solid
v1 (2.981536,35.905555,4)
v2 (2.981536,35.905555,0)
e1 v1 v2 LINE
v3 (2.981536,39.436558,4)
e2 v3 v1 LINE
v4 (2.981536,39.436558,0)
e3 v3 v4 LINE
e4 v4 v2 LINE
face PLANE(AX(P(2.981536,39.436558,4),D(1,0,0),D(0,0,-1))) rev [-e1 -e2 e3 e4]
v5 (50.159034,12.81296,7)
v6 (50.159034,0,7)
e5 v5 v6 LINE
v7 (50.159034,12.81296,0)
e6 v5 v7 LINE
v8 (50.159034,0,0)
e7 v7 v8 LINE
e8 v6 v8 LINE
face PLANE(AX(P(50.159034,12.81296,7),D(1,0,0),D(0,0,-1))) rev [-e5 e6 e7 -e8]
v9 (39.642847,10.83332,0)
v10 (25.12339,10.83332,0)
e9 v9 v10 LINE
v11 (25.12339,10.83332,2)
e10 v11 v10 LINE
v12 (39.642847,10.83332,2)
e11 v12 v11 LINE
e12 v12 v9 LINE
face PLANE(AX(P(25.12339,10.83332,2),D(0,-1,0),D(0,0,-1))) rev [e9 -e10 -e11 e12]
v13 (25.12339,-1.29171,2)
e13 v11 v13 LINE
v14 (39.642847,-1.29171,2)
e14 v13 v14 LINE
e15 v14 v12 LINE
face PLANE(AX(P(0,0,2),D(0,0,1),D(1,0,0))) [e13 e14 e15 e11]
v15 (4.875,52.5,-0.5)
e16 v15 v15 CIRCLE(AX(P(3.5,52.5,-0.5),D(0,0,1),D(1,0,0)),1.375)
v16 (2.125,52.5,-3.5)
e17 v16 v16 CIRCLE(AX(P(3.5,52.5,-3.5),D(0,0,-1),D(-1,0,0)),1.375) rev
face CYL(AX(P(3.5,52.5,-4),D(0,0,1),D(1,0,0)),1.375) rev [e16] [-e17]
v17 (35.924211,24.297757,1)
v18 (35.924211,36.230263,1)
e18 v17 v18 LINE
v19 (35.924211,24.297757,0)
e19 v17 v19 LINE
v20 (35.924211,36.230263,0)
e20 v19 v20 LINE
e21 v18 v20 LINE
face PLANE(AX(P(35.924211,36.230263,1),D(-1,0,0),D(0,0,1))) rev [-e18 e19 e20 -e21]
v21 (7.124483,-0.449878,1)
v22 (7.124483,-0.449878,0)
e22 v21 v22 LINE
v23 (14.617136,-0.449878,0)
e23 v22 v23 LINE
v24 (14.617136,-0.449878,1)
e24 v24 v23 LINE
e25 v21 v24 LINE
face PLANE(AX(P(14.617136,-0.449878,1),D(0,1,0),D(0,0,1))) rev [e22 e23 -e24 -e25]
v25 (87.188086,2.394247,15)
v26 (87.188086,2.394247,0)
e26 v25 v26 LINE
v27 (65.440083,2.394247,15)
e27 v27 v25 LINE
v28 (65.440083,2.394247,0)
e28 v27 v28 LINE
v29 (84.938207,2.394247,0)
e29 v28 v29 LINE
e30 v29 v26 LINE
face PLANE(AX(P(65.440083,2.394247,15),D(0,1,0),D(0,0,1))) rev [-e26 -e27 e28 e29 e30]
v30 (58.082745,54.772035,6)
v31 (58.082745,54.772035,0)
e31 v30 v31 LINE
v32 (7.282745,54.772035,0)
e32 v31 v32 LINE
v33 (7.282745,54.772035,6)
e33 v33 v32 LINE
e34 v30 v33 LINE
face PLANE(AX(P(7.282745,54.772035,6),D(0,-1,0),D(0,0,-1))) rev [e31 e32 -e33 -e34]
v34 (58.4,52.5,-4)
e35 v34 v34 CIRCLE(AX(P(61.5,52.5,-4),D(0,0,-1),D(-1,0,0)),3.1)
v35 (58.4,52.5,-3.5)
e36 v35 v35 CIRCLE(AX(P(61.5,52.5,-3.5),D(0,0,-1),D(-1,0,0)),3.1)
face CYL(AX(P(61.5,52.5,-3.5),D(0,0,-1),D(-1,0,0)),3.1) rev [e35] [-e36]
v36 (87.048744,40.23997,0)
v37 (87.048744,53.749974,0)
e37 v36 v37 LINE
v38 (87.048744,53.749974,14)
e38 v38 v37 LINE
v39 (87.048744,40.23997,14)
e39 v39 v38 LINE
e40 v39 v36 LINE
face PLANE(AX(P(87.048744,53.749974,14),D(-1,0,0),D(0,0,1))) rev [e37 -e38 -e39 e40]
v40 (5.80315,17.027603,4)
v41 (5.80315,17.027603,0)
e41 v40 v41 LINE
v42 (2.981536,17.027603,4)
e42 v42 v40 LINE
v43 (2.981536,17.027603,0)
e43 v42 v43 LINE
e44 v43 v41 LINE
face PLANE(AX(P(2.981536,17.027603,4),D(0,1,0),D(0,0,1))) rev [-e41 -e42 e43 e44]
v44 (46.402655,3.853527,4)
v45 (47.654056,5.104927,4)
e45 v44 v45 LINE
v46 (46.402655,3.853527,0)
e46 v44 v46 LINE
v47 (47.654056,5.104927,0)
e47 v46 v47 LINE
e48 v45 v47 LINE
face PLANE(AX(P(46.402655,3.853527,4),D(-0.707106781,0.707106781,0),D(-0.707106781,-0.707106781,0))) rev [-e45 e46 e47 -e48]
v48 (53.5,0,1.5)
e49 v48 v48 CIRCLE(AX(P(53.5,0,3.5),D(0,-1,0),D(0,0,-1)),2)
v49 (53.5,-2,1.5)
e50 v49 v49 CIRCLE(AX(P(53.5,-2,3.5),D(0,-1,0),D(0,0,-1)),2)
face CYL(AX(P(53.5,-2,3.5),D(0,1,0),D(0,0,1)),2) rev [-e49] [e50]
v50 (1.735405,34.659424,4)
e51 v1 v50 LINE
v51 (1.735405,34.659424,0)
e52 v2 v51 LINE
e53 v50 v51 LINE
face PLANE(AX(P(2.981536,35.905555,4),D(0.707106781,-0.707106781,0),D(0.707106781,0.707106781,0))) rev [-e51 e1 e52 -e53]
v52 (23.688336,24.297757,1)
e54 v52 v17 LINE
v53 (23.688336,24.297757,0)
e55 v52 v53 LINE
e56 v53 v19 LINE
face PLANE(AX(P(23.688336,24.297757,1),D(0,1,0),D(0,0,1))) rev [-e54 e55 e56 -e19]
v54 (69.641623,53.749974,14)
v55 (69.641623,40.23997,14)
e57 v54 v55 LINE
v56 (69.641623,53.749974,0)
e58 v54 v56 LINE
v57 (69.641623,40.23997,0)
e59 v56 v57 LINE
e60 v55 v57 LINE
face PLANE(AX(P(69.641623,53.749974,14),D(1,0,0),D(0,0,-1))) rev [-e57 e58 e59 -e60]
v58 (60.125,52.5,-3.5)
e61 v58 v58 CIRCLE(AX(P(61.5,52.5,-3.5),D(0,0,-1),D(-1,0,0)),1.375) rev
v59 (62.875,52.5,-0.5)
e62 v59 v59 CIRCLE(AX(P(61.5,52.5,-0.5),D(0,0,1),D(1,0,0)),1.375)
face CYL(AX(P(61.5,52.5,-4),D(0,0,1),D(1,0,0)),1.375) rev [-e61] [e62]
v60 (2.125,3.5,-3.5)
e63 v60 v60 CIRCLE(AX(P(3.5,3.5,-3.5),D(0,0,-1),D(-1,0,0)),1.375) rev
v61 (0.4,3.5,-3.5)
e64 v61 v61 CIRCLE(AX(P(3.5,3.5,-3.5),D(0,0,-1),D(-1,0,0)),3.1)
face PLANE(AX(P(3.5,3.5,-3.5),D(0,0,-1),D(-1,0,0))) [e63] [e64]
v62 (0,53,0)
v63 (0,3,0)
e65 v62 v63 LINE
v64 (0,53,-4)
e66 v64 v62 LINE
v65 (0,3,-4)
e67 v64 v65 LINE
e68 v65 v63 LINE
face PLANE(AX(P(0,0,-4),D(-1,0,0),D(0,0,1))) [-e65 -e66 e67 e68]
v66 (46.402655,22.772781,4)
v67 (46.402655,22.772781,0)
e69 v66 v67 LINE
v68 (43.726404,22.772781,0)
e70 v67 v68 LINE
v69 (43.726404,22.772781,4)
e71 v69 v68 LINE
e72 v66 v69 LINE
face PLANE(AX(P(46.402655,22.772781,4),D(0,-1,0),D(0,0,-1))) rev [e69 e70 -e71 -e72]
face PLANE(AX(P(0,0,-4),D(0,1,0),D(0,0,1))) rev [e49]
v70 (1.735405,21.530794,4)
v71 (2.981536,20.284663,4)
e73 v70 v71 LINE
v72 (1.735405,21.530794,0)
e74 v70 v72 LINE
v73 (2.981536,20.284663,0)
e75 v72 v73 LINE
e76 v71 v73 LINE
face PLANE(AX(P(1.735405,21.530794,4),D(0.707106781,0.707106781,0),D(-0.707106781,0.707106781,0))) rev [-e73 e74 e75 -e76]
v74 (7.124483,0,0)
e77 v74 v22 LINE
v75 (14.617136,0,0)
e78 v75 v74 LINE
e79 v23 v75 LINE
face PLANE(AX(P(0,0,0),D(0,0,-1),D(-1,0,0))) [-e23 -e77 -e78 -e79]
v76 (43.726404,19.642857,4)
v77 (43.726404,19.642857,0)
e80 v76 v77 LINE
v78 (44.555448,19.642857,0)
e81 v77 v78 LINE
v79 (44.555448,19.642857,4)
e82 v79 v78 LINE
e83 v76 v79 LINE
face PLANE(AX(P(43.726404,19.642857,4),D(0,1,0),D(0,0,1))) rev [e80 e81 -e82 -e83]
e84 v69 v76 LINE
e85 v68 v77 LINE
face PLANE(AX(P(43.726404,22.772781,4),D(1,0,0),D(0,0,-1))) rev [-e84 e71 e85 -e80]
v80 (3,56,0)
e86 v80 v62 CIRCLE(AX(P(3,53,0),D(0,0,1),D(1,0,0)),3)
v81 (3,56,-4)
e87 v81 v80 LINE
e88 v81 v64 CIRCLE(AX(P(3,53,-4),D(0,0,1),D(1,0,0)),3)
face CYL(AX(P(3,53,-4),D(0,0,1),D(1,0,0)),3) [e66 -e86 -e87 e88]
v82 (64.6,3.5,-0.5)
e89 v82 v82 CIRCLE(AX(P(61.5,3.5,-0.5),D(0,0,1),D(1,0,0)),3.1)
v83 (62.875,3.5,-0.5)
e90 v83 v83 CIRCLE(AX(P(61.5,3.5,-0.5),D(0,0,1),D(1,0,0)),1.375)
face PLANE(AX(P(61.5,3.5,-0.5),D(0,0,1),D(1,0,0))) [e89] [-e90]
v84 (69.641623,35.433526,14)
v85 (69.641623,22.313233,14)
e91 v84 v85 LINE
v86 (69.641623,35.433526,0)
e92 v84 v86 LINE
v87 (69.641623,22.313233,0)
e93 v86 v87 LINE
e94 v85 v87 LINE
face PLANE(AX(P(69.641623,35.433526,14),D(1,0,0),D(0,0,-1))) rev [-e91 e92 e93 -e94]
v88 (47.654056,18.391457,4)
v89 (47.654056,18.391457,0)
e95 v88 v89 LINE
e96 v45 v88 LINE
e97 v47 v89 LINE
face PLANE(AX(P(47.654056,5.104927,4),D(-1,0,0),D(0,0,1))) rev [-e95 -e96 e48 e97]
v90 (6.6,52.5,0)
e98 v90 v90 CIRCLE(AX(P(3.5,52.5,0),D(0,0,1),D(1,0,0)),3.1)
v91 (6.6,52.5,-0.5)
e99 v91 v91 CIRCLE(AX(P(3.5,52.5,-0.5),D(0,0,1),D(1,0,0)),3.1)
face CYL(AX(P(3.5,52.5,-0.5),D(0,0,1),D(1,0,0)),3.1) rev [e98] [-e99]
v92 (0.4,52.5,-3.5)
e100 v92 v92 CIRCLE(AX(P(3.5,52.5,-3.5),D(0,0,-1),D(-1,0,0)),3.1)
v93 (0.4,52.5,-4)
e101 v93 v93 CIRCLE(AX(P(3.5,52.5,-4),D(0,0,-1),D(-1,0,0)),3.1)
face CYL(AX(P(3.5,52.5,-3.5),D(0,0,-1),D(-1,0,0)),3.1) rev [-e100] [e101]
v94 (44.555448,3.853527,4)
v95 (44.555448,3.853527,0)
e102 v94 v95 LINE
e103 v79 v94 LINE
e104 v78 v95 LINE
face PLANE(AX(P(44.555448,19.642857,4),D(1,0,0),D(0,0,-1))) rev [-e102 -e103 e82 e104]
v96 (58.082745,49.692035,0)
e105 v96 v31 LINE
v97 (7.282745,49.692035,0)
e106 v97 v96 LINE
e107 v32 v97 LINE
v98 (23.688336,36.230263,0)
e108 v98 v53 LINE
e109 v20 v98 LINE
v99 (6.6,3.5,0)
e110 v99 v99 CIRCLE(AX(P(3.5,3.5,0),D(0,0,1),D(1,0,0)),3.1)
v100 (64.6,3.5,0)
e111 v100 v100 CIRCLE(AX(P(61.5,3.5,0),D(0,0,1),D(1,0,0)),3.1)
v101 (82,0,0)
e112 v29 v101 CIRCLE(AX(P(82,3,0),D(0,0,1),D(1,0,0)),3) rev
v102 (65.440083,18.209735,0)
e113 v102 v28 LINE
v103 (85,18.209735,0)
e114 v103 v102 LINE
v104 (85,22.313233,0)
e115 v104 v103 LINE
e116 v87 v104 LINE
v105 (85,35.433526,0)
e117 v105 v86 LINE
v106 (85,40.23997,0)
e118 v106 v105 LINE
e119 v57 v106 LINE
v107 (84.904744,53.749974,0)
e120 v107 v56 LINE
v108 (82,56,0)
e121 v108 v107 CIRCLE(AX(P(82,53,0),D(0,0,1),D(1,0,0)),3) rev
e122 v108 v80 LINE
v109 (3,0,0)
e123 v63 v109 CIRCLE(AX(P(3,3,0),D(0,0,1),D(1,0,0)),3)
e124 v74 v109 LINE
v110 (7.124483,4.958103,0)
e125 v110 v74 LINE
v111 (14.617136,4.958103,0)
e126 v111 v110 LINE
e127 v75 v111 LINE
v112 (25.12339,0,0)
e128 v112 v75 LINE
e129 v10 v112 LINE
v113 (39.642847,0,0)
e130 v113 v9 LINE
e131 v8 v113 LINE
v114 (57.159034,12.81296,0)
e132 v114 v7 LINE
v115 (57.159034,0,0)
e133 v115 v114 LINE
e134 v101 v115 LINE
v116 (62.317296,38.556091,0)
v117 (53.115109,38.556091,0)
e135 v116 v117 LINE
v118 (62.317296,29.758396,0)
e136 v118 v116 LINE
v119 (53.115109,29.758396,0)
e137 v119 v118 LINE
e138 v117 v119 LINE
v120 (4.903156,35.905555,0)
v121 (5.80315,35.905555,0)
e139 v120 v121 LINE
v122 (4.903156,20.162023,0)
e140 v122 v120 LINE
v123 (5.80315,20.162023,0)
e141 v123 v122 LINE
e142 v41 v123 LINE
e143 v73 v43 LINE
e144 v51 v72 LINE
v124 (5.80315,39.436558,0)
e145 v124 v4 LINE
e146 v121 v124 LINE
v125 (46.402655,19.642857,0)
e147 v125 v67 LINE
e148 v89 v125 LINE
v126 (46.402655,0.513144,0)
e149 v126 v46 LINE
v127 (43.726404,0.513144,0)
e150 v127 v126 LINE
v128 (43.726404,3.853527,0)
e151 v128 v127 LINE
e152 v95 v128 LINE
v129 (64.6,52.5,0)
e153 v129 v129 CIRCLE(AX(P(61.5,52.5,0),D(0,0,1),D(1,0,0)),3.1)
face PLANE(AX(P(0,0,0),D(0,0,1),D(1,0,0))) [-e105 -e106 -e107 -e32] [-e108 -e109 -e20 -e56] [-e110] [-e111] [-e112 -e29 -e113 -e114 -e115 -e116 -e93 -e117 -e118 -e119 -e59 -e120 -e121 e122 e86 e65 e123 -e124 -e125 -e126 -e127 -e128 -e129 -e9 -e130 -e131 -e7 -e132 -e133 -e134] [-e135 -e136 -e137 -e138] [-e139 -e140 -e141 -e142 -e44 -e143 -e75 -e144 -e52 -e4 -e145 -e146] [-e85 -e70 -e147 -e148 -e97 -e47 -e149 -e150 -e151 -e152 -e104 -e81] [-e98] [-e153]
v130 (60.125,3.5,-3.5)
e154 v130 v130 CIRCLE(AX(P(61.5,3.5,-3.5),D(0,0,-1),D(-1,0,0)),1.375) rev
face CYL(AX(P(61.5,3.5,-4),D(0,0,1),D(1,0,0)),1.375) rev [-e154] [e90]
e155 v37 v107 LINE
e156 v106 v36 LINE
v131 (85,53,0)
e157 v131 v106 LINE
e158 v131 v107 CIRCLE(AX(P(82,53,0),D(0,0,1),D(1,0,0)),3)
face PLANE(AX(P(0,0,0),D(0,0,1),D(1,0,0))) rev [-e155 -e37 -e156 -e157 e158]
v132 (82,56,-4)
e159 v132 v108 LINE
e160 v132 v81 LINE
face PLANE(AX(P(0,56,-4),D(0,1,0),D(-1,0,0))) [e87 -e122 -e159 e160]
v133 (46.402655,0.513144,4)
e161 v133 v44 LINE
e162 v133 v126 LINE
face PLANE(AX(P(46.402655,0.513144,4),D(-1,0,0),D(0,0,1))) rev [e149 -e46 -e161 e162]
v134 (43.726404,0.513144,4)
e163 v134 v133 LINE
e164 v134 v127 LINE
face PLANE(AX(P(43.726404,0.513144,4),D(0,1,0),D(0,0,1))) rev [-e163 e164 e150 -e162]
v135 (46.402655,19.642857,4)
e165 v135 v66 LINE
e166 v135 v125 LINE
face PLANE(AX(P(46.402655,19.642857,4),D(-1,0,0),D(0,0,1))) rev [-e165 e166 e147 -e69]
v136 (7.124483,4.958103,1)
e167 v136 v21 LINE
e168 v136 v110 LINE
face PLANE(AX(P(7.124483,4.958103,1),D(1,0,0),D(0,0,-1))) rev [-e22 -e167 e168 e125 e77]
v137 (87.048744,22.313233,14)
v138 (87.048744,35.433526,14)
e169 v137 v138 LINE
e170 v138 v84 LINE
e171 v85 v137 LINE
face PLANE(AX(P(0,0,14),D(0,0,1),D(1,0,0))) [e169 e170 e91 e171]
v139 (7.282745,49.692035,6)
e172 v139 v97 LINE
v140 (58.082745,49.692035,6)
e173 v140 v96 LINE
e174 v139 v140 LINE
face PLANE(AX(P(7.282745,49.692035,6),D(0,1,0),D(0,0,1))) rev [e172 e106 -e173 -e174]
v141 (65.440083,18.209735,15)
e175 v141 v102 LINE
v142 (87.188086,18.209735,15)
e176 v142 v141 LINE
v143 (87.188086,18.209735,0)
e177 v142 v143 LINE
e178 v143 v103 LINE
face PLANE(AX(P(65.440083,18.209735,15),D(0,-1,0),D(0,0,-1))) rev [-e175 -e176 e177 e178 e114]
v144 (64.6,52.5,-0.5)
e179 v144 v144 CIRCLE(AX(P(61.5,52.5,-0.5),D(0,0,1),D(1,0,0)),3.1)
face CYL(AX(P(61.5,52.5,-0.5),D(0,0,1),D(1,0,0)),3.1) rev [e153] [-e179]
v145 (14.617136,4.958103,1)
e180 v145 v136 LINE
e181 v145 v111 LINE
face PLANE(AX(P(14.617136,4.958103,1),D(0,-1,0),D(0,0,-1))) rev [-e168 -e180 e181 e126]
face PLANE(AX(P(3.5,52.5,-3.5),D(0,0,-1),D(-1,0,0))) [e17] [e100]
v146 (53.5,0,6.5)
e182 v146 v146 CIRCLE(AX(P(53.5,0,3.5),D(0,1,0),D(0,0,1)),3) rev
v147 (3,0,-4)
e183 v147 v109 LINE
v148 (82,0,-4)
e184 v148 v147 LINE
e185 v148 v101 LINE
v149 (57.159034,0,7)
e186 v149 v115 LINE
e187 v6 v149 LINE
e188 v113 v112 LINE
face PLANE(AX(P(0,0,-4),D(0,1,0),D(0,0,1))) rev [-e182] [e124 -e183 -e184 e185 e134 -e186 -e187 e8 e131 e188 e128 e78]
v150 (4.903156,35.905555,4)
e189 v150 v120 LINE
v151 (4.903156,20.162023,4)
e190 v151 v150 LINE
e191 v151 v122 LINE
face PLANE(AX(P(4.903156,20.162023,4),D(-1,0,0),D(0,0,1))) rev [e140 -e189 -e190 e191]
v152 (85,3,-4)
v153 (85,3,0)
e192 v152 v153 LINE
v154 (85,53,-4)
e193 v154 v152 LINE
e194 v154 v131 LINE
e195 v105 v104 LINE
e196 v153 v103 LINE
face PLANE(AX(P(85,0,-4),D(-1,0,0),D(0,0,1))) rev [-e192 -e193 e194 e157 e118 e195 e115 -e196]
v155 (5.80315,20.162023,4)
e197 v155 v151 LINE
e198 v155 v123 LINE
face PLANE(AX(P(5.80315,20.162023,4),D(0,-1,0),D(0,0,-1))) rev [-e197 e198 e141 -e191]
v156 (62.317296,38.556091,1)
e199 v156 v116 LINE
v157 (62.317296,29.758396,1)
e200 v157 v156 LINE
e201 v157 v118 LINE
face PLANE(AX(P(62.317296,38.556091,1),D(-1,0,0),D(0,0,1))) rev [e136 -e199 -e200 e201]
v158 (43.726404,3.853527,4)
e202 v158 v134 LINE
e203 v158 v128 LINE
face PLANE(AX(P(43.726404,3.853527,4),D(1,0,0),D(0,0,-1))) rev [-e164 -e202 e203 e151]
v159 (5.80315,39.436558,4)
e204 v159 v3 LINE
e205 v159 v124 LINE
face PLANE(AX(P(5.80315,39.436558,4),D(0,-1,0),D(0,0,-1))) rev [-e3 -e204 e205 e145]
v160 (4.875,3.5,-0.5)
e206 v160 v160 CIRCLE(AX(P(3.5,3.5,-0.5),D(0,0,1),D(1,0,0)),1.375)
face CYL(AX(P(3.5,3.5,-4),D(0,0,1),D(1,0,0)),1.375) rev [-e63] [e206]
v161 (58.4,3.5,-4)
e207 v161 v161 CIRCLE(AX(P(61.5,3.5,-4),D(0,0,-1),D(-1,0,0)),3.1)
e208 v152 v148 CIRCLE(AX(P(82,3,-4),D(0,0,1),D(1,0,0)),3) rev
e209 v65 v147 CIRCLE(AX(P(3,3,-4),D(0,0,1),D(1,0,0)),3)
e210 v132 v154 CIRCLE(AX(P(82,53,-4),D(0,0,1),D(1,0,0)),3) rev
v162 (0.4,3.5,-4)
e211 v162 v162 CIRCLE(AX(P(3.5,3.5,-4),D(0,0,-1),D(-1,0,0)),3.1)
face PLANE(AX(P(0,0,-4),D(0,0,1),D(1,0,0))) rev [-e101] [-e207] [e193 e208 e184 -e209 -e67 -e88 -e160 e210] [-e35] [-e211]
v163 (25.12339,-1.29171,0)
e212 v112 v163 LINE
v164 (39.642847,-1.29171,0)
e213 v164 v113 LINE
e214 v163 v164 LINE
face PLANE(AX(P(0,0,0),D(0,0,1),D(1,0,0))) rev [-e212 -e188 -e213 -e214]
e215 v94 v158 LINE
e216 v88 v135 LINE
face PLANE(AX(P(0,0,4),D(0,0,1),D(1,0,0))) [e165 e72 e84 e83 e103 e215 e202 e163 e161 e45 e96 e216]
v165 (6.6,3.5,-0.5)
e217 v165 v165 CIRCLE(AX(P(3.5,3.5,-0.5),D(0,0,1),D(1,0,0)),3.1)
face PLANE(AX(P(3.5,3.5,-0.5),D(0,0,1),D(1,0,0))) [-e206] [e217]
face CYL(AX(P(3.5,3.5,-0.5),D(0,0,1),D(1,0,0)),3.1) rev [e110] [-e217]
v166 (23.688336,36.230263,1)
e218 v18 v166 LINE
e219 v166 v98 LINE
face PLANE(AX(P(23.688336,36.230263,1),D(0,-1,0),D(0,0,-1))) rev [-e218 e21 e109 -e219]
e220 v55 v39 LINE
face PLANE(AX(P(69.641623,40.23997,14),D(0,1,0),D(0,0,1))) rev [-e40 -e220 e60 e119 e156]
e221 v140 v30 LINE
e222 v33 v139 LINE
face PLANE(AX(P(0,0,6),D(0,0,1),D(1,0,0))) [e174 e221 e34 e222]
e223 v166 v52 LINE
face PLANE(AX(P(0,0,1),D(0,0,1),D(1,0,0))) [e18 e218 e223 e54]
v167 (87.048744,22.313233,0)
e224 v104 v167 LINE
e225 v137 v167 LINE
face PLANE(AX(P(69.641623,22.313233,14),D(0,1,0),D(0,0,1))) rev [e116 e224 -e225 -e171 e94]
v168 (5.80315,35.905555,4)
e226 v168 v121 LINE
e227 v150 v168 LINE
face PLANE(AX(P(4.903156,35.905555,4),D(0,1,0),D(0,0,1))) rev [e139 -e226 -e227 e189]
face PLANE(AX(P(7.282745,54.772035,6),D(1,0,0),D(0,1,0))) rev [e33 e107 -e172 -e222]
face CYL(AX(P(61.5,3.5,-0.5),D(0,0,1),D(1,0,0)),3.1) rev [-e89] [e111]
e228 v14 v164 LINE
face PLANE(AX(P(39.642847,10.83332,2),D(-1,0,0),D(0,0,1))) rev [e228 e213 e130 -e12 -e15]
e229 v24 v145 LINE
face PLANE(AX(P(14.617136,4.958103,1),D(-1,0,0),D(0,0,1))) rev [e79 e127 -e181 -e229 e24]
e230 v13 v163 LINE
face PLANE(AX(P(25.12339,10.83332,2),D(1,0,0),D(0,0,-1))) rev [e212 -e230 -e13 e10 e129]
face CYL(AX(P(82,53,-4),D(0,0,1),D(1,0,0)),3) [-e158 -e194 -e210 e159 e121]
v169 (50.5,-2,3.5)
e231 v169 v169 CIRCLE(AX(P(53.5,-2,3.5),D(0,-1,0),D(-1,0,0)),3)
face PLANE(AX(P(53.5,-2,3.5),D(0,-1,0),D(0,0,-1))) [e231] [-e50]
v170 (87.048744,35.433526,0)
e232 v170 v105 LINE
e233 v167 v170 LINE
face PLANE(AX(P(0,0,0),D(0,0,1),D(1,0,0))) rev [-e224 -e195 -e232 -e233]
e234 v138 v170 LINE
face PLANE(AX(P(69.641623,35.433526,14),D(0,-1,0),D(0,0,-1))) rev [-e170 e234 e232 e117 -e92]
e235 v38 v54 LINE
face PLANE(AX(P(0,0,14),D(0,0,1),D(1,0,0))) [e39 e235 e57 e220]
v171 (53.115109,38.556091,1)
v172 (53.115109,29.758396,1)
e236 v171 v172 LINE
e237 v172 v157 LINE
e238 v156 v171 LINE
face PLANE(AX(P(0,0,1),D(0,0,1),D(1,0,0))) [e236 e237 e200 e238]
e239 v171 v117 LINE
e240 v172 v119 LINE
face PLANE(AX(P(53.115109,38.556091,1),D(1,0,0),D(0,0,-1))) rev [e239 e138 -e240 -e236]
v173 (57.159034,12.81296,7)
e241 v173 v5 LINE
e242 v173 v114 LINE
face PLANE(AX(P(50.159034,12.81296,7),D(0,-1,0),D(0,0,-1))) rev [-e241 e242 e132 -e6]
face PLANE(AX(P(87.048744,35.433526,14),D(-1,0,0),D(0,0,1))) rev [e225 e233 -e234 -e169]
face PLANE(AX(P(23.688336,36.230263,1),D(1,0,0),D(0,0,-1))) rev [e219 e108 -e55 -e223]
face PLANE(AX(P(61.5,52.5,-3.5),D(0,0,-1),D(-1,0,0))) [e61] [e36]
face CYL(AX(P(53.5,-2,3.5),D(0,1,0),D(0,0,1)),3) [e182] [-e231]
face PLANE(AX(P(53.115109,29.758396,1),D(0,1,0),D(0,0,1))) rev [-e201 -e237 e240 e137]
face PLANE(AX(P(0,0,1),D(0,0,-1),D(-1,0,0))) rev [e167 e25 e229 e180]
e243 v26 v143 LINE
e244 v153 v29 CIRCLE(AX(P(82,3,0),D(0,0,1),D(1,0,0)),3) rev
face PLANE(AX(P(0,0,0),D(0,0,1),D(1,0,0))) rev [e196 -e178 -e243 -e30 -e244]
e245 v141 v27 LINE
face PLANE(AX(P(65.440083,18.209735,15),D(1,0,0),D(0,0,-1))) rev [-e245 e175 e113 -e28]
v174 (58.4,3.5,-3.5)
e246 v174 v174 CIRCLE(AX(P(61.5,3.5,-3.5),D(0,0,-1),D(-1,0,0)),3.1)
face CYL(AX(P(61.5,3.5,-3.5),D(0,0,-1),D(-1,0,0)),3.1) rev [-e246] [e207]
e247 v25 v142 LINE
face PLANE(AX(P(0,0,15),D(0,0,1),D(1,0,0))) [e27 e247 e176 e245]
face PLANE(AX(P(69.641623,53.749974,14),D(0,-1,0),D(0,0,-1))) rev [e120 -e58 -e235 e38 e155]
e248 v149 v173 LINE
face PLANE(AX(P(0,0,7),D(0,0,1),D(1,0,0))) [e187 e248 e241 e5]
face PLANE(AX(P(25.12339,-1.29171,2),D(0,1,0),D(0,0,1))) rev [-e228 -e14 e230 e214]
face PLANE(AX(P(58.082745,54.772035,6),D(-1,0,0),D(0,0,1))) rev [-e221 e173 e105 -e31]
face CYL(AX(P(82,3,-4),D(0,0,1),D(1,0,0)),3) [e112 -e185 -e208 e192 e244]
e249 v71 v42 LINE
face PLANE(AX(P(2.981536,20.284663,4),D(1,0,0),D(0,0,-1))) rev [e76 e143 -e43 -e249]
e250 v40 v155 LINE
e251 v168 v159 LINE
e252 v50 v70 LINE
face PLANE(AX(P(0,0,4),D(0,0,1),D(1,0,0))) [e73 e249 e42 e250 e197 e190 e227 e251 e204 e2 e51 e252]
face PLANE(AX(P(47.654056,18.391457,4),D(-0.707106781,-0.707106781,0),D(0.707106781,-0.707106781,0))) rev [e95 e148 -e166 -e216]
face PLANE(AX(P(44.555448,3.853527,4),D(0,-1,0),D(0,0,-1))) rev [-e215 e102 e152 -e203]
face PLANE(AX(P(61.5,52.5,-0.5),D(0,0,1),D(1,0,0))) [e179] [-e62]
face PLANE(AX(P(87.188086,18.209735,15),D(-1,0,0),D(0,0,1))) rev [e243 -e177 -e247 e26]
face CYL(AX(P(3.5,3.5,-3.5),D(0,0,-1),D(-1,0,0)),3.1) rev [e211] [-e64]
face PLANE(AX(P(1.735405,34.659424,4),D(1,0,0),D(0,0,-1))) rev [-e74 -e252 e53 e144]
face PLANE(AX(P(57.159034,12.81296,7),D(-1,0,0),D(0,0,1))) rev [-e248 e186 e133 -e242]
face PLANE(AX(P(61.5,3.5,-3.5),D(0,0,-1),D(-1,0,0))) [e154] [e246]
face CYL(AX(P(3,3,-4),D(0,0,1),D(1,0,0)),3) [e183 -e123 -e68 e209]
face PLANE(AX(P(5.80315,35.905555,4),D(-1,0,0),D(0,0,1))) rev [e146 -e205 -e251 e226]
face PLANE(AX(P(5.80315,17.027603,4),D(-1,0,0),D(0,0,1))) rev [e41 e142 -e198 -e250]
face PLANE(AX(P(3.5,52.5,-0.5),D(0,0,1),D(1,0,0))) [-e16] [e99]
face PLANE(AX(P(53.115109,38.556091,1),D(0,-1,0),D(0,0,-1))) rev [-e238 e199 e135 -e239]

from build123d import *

# Parameters (mm, degrees)
EXTRUDE_START       = -4
EXTRUDE_2_DEPTH     = 4
SKETCH_2_R          = 3.1
CUT_EXTRUDE_1_DEPTH = 0.5
SKETCH_3_R          = 1.375
CUT_EXTRUDE_2_DEPTH = 4
SKETCH_4_W          = 50.8
SKETCH_4_H          = 5.08
EXTRUDE_3_DEPTH     = 6
SKETCH_5_W          = 12.235874624
SKETCH_5_H          = 11.932505832
EXTRUDE_4_DEPTH     = 1
SKETCH_6_W          = 17.407120639
SKETCH_6_H          = 13.510004078
SKETCH_6_H_2        = 13.120292422
EXTRUDE_5_DEPTH     = 14
SKETCH_7_W          = 21.748003317
SKETCH_7_H          = 15.815488158
EXTRUDE_6_DEPTH     = 15
SKETCH_8_W          = 9.2021867
SKETCH_8_H          = 8.797694978
EXTRUDE_7_DEPTH     = 1
SKETCH_9_W          = 14.519457286
SKETCH_9_H          = 12.125029798
EXTRUDE_8_DEPTH     = 2
SKETCH_10_W         = 7
SKETCH_10_H         = 12.812960392
EXTRUDE_9_DEPTH     = 7
SKETCH_11_R         = 3
SKETCH_11_R_2       = 2
EXTRUDE_1_DEPTH     = 2
EXTRUDE_10_DEPTH    = 4
SKETCH_13_W         = 7.492652901
SKETCH_13_H         = 5.40798094
EXTRUDE_11_DEPTH    = 1
EXTRUDE_12_DEPTH    = 4
CUT_EXTRUDE_START   = -0.5
SKETCH_15_R         = 3.1
CUT_EXTRUDE_3_DEPTH = 0.5


# Read off the part's stored shape, not the designer's step: 凸台-拉伸2
with BuildPart() as part:
    # 凸台-拉伸2 outline → 凸台-拉伸2 (new body)
    with BuildSketch(Plane.XY.offset(EXTRUDE_START)):
        with BuildLine():
            ThreePointArc((3, 56), (0.878679656, 55.121320344), (0, 53))
            Line((0, 53), (0, 3))
            ThreePointArc((0, 3), (0.878679656, 0.878679656), (3, 0))
            Line((3, 0), (82, 0))
            ThreePointArc((82, 0), (84.121320344, 0.878679656), (85, 3))
            Line((85, 3), (85, 53))
            ThreePointArc((85, 53), (84.121320344, 55.121320344), (82, 56))
            Line((82, 56), (3, 56))
        make_face()
    extrude(amount=EXTRUDE_2_DEPTH)

    # 草图2 → 切除-拉伸1 (cut)
    with BuildSketch(Plane.XY):
        with Locations((3.5, 3.5)):
            Circle(SKETCH_2_R)
        with Locations((61.5, 3.5)):
            Circle(SKETCH_2_R)
        with Locations((3.5, 52.5)):
            Circle(SKETCH_2_R)
        with Locations((61.5, 52.5)):
            Circle(SKETCH_2_R)
    extrude(amount=-CUT_EXTRUDE_1_DEPTH, mode=Mode.SUBTRACT)

    # 草图3 → 切除-拉伸2 (cut)
    with BuildSketch(Plane.XY):
        with Locations((3.5, 52.5)):
            Circle(SKETCH_3_R)
        with Locations((61.5, 52.5)):
            Circle(SKETCH_3_R)
        with Locations((3.5, 3.5)):
            Circle(SKETCH_3_R)
        with Locations((61.5, 3.5)):
            Circle(SKETCH_3_R)
    extrude(amount=-CUT_EXTRUDE_2_DEPTH, mode=Mode.SUBTRACT)

    # 草图4 → 凸台-拉伸3 (add)
    with BuildSketch(Plane.XY):
        with Locations((32.682745254, 52.232035351)):
            Rectangle(SKETCH_4_W, SKETCH_4_H)
    extrude(amount=EXTRUDE_3_DEPTH)

    # 草图5 → 凸台-拉伸4 (add)
    with BuildSketch(Plane.XY):
        with Locations((29.806273598, 30.264010216)):
            Rectangle(SKETCH_5_W, SKETCH_5_H)
    extrude(amount=EXTRUDE_4_DEPTH)

    # 草图6 → 凸台-拉伸5 (add)
    with BuildSketch(Plane.XY):
        with Locations((78.345183612, 46.994971673)):
            Rectangle(SKETCH_6_W, SKETCH_6_H)
        with Locations((78.345183612, 28.873379664)):
            Rectangle(SKETCH_6_W, SKETCH_6_H_2)
    extrude(amount=EXTRUDE_5_DEPTH)

    # 草图7 → 凸台-拉伸6 (add)
    with BuildSketch(Plane.XY):
        with Locations((76.314084713, 10.301990913)):
            Rectangle(SKETCH_7_W, SKETCH_7_H)
    extrude(amount=EXTRUDE_6_DEPTH)

    # 草图8 → 凸台-拉伸7 (add)
    with BuildSketch(Plane.XY):
        with Locations((57.716202493, 34.157243051)):
            Rectangle(SKETCH_8_W, SKETCH_8_H)
    extrude(amount=EXTRUDE_7_DEPTH)

    # 草图9 → 凸台-拉伸8 (add)
    with BuildSketch(Plane.XY):
        with Locations((32.383118315, 4.770804671)):
            Rectangle(SKETCH_9_W, SKETCH_9_H)
    extrude(amount=EXTRUDE_8_DEPTH)

    # 草图10 → 凸台-拉伸9 (add)
    with BuildSketch(Plane.XY):
        with Locations((53.659033893, 6.406480196)):
            Rectangle(SKETCH_10_W, SKETCH_10_H)
    extrude(amount=EXTRUDE_9_DEPTH)

    # 草图11 → 拉伸-薄壁1 (add)
    with BuildSketch(Plane(origin=(0, 0, 0), x_dir=(-1, 0, 0), z_dir=(0, -1, 0))):
        with Locations((-53.5, -3.5)):
            Circle(SKETCH_11_R)
        with Locations((-53.5, -3.5)):
            Circle(SKETCH_11_R_2, mode=Mode.SUBTRACT)
    extrude(amount=EXTRUDE_1_DEPTH)

    # 草图12 → 凸台-拉伸10 (add)
    with BuildSketch(Plane.XY):
        Polygon((43.726404027, 3.853526794), (43.726404027, 0.513143902), (46.402655395, 0.513143902), (46.402655395, 3.853526794), (47.65405595, 5.104927349), (47.65405595, 18.391456575), (46.402655395, 19.64285713), (46.402655395, 22.77278121), (43.726404027, 22.77278121), (43.726404027, 19.64285713), (44.555447726, 19.64285713), (44.555447726, 3.853526794), align=None)
    extrude(amount=EXTRUDE_10_DEPTH)

    # 草图13 → 凸台-拉伸11 (add)
    with BuildSketch(Plane.XY):
        with Locations((10.870809128, 2.254112914)):
            Rectangle(SKETCH_13_W, SKETCH_13_H)
    extrude(amount=EXTRUDE_11_DEPTH)

    # 草图14 → 凸台-拉伸12 (add)
    with BuildSketch(Plane.XY):
        Polygon((2.981536039, 17.027603439), (5.803149545, 17.027603439), (5.803149545, 20.162023057), (4.903155557, 20.162023057), (4.903155557, 35.905554668), (5.803149545, 35.905554668), (5.803149545, 39.436558403), (2.981536039, 39.436558403), (2.981536039, 35.905554668), (1.735405071, 34.659423699), (1.735405071, 21.530793828), (2.981536039, 20.28466286), align=None)
    extrude(amount=EXTRUDE_12_DEPTH)

    # 草图15 → 切除-拉伸3 (cut)
    with BuildSketch(Plane(origin=(0, 0, -4), x_dir=(-1, 0, 0), z_dir=(0, 0, -1)).offset(CUT_EXTRUDE_START)):
        with Locations(Location((-61.5, 52.5, 0), (0, 0, 180))):
            Circle(SKETCH_15_R)
        with Locations(Location((-61.5, 3.5, 0), (0, 0, 180))):
            Circle(SKETCH_15_R)
        with Locations(Location((-3.5, 52.5, 0), (0, 0, 180))):
            Circle(SKETCH_15_R)
        with Locations(Location((-3.5, 3.5, 0), (0, 0, 180))):
            Circle(SKETCH_15_R)
    extrude(amount=CUT_EXTRUDE_3_DEPTH, mode=Mode.SUBTRACT)


solid = part.part
